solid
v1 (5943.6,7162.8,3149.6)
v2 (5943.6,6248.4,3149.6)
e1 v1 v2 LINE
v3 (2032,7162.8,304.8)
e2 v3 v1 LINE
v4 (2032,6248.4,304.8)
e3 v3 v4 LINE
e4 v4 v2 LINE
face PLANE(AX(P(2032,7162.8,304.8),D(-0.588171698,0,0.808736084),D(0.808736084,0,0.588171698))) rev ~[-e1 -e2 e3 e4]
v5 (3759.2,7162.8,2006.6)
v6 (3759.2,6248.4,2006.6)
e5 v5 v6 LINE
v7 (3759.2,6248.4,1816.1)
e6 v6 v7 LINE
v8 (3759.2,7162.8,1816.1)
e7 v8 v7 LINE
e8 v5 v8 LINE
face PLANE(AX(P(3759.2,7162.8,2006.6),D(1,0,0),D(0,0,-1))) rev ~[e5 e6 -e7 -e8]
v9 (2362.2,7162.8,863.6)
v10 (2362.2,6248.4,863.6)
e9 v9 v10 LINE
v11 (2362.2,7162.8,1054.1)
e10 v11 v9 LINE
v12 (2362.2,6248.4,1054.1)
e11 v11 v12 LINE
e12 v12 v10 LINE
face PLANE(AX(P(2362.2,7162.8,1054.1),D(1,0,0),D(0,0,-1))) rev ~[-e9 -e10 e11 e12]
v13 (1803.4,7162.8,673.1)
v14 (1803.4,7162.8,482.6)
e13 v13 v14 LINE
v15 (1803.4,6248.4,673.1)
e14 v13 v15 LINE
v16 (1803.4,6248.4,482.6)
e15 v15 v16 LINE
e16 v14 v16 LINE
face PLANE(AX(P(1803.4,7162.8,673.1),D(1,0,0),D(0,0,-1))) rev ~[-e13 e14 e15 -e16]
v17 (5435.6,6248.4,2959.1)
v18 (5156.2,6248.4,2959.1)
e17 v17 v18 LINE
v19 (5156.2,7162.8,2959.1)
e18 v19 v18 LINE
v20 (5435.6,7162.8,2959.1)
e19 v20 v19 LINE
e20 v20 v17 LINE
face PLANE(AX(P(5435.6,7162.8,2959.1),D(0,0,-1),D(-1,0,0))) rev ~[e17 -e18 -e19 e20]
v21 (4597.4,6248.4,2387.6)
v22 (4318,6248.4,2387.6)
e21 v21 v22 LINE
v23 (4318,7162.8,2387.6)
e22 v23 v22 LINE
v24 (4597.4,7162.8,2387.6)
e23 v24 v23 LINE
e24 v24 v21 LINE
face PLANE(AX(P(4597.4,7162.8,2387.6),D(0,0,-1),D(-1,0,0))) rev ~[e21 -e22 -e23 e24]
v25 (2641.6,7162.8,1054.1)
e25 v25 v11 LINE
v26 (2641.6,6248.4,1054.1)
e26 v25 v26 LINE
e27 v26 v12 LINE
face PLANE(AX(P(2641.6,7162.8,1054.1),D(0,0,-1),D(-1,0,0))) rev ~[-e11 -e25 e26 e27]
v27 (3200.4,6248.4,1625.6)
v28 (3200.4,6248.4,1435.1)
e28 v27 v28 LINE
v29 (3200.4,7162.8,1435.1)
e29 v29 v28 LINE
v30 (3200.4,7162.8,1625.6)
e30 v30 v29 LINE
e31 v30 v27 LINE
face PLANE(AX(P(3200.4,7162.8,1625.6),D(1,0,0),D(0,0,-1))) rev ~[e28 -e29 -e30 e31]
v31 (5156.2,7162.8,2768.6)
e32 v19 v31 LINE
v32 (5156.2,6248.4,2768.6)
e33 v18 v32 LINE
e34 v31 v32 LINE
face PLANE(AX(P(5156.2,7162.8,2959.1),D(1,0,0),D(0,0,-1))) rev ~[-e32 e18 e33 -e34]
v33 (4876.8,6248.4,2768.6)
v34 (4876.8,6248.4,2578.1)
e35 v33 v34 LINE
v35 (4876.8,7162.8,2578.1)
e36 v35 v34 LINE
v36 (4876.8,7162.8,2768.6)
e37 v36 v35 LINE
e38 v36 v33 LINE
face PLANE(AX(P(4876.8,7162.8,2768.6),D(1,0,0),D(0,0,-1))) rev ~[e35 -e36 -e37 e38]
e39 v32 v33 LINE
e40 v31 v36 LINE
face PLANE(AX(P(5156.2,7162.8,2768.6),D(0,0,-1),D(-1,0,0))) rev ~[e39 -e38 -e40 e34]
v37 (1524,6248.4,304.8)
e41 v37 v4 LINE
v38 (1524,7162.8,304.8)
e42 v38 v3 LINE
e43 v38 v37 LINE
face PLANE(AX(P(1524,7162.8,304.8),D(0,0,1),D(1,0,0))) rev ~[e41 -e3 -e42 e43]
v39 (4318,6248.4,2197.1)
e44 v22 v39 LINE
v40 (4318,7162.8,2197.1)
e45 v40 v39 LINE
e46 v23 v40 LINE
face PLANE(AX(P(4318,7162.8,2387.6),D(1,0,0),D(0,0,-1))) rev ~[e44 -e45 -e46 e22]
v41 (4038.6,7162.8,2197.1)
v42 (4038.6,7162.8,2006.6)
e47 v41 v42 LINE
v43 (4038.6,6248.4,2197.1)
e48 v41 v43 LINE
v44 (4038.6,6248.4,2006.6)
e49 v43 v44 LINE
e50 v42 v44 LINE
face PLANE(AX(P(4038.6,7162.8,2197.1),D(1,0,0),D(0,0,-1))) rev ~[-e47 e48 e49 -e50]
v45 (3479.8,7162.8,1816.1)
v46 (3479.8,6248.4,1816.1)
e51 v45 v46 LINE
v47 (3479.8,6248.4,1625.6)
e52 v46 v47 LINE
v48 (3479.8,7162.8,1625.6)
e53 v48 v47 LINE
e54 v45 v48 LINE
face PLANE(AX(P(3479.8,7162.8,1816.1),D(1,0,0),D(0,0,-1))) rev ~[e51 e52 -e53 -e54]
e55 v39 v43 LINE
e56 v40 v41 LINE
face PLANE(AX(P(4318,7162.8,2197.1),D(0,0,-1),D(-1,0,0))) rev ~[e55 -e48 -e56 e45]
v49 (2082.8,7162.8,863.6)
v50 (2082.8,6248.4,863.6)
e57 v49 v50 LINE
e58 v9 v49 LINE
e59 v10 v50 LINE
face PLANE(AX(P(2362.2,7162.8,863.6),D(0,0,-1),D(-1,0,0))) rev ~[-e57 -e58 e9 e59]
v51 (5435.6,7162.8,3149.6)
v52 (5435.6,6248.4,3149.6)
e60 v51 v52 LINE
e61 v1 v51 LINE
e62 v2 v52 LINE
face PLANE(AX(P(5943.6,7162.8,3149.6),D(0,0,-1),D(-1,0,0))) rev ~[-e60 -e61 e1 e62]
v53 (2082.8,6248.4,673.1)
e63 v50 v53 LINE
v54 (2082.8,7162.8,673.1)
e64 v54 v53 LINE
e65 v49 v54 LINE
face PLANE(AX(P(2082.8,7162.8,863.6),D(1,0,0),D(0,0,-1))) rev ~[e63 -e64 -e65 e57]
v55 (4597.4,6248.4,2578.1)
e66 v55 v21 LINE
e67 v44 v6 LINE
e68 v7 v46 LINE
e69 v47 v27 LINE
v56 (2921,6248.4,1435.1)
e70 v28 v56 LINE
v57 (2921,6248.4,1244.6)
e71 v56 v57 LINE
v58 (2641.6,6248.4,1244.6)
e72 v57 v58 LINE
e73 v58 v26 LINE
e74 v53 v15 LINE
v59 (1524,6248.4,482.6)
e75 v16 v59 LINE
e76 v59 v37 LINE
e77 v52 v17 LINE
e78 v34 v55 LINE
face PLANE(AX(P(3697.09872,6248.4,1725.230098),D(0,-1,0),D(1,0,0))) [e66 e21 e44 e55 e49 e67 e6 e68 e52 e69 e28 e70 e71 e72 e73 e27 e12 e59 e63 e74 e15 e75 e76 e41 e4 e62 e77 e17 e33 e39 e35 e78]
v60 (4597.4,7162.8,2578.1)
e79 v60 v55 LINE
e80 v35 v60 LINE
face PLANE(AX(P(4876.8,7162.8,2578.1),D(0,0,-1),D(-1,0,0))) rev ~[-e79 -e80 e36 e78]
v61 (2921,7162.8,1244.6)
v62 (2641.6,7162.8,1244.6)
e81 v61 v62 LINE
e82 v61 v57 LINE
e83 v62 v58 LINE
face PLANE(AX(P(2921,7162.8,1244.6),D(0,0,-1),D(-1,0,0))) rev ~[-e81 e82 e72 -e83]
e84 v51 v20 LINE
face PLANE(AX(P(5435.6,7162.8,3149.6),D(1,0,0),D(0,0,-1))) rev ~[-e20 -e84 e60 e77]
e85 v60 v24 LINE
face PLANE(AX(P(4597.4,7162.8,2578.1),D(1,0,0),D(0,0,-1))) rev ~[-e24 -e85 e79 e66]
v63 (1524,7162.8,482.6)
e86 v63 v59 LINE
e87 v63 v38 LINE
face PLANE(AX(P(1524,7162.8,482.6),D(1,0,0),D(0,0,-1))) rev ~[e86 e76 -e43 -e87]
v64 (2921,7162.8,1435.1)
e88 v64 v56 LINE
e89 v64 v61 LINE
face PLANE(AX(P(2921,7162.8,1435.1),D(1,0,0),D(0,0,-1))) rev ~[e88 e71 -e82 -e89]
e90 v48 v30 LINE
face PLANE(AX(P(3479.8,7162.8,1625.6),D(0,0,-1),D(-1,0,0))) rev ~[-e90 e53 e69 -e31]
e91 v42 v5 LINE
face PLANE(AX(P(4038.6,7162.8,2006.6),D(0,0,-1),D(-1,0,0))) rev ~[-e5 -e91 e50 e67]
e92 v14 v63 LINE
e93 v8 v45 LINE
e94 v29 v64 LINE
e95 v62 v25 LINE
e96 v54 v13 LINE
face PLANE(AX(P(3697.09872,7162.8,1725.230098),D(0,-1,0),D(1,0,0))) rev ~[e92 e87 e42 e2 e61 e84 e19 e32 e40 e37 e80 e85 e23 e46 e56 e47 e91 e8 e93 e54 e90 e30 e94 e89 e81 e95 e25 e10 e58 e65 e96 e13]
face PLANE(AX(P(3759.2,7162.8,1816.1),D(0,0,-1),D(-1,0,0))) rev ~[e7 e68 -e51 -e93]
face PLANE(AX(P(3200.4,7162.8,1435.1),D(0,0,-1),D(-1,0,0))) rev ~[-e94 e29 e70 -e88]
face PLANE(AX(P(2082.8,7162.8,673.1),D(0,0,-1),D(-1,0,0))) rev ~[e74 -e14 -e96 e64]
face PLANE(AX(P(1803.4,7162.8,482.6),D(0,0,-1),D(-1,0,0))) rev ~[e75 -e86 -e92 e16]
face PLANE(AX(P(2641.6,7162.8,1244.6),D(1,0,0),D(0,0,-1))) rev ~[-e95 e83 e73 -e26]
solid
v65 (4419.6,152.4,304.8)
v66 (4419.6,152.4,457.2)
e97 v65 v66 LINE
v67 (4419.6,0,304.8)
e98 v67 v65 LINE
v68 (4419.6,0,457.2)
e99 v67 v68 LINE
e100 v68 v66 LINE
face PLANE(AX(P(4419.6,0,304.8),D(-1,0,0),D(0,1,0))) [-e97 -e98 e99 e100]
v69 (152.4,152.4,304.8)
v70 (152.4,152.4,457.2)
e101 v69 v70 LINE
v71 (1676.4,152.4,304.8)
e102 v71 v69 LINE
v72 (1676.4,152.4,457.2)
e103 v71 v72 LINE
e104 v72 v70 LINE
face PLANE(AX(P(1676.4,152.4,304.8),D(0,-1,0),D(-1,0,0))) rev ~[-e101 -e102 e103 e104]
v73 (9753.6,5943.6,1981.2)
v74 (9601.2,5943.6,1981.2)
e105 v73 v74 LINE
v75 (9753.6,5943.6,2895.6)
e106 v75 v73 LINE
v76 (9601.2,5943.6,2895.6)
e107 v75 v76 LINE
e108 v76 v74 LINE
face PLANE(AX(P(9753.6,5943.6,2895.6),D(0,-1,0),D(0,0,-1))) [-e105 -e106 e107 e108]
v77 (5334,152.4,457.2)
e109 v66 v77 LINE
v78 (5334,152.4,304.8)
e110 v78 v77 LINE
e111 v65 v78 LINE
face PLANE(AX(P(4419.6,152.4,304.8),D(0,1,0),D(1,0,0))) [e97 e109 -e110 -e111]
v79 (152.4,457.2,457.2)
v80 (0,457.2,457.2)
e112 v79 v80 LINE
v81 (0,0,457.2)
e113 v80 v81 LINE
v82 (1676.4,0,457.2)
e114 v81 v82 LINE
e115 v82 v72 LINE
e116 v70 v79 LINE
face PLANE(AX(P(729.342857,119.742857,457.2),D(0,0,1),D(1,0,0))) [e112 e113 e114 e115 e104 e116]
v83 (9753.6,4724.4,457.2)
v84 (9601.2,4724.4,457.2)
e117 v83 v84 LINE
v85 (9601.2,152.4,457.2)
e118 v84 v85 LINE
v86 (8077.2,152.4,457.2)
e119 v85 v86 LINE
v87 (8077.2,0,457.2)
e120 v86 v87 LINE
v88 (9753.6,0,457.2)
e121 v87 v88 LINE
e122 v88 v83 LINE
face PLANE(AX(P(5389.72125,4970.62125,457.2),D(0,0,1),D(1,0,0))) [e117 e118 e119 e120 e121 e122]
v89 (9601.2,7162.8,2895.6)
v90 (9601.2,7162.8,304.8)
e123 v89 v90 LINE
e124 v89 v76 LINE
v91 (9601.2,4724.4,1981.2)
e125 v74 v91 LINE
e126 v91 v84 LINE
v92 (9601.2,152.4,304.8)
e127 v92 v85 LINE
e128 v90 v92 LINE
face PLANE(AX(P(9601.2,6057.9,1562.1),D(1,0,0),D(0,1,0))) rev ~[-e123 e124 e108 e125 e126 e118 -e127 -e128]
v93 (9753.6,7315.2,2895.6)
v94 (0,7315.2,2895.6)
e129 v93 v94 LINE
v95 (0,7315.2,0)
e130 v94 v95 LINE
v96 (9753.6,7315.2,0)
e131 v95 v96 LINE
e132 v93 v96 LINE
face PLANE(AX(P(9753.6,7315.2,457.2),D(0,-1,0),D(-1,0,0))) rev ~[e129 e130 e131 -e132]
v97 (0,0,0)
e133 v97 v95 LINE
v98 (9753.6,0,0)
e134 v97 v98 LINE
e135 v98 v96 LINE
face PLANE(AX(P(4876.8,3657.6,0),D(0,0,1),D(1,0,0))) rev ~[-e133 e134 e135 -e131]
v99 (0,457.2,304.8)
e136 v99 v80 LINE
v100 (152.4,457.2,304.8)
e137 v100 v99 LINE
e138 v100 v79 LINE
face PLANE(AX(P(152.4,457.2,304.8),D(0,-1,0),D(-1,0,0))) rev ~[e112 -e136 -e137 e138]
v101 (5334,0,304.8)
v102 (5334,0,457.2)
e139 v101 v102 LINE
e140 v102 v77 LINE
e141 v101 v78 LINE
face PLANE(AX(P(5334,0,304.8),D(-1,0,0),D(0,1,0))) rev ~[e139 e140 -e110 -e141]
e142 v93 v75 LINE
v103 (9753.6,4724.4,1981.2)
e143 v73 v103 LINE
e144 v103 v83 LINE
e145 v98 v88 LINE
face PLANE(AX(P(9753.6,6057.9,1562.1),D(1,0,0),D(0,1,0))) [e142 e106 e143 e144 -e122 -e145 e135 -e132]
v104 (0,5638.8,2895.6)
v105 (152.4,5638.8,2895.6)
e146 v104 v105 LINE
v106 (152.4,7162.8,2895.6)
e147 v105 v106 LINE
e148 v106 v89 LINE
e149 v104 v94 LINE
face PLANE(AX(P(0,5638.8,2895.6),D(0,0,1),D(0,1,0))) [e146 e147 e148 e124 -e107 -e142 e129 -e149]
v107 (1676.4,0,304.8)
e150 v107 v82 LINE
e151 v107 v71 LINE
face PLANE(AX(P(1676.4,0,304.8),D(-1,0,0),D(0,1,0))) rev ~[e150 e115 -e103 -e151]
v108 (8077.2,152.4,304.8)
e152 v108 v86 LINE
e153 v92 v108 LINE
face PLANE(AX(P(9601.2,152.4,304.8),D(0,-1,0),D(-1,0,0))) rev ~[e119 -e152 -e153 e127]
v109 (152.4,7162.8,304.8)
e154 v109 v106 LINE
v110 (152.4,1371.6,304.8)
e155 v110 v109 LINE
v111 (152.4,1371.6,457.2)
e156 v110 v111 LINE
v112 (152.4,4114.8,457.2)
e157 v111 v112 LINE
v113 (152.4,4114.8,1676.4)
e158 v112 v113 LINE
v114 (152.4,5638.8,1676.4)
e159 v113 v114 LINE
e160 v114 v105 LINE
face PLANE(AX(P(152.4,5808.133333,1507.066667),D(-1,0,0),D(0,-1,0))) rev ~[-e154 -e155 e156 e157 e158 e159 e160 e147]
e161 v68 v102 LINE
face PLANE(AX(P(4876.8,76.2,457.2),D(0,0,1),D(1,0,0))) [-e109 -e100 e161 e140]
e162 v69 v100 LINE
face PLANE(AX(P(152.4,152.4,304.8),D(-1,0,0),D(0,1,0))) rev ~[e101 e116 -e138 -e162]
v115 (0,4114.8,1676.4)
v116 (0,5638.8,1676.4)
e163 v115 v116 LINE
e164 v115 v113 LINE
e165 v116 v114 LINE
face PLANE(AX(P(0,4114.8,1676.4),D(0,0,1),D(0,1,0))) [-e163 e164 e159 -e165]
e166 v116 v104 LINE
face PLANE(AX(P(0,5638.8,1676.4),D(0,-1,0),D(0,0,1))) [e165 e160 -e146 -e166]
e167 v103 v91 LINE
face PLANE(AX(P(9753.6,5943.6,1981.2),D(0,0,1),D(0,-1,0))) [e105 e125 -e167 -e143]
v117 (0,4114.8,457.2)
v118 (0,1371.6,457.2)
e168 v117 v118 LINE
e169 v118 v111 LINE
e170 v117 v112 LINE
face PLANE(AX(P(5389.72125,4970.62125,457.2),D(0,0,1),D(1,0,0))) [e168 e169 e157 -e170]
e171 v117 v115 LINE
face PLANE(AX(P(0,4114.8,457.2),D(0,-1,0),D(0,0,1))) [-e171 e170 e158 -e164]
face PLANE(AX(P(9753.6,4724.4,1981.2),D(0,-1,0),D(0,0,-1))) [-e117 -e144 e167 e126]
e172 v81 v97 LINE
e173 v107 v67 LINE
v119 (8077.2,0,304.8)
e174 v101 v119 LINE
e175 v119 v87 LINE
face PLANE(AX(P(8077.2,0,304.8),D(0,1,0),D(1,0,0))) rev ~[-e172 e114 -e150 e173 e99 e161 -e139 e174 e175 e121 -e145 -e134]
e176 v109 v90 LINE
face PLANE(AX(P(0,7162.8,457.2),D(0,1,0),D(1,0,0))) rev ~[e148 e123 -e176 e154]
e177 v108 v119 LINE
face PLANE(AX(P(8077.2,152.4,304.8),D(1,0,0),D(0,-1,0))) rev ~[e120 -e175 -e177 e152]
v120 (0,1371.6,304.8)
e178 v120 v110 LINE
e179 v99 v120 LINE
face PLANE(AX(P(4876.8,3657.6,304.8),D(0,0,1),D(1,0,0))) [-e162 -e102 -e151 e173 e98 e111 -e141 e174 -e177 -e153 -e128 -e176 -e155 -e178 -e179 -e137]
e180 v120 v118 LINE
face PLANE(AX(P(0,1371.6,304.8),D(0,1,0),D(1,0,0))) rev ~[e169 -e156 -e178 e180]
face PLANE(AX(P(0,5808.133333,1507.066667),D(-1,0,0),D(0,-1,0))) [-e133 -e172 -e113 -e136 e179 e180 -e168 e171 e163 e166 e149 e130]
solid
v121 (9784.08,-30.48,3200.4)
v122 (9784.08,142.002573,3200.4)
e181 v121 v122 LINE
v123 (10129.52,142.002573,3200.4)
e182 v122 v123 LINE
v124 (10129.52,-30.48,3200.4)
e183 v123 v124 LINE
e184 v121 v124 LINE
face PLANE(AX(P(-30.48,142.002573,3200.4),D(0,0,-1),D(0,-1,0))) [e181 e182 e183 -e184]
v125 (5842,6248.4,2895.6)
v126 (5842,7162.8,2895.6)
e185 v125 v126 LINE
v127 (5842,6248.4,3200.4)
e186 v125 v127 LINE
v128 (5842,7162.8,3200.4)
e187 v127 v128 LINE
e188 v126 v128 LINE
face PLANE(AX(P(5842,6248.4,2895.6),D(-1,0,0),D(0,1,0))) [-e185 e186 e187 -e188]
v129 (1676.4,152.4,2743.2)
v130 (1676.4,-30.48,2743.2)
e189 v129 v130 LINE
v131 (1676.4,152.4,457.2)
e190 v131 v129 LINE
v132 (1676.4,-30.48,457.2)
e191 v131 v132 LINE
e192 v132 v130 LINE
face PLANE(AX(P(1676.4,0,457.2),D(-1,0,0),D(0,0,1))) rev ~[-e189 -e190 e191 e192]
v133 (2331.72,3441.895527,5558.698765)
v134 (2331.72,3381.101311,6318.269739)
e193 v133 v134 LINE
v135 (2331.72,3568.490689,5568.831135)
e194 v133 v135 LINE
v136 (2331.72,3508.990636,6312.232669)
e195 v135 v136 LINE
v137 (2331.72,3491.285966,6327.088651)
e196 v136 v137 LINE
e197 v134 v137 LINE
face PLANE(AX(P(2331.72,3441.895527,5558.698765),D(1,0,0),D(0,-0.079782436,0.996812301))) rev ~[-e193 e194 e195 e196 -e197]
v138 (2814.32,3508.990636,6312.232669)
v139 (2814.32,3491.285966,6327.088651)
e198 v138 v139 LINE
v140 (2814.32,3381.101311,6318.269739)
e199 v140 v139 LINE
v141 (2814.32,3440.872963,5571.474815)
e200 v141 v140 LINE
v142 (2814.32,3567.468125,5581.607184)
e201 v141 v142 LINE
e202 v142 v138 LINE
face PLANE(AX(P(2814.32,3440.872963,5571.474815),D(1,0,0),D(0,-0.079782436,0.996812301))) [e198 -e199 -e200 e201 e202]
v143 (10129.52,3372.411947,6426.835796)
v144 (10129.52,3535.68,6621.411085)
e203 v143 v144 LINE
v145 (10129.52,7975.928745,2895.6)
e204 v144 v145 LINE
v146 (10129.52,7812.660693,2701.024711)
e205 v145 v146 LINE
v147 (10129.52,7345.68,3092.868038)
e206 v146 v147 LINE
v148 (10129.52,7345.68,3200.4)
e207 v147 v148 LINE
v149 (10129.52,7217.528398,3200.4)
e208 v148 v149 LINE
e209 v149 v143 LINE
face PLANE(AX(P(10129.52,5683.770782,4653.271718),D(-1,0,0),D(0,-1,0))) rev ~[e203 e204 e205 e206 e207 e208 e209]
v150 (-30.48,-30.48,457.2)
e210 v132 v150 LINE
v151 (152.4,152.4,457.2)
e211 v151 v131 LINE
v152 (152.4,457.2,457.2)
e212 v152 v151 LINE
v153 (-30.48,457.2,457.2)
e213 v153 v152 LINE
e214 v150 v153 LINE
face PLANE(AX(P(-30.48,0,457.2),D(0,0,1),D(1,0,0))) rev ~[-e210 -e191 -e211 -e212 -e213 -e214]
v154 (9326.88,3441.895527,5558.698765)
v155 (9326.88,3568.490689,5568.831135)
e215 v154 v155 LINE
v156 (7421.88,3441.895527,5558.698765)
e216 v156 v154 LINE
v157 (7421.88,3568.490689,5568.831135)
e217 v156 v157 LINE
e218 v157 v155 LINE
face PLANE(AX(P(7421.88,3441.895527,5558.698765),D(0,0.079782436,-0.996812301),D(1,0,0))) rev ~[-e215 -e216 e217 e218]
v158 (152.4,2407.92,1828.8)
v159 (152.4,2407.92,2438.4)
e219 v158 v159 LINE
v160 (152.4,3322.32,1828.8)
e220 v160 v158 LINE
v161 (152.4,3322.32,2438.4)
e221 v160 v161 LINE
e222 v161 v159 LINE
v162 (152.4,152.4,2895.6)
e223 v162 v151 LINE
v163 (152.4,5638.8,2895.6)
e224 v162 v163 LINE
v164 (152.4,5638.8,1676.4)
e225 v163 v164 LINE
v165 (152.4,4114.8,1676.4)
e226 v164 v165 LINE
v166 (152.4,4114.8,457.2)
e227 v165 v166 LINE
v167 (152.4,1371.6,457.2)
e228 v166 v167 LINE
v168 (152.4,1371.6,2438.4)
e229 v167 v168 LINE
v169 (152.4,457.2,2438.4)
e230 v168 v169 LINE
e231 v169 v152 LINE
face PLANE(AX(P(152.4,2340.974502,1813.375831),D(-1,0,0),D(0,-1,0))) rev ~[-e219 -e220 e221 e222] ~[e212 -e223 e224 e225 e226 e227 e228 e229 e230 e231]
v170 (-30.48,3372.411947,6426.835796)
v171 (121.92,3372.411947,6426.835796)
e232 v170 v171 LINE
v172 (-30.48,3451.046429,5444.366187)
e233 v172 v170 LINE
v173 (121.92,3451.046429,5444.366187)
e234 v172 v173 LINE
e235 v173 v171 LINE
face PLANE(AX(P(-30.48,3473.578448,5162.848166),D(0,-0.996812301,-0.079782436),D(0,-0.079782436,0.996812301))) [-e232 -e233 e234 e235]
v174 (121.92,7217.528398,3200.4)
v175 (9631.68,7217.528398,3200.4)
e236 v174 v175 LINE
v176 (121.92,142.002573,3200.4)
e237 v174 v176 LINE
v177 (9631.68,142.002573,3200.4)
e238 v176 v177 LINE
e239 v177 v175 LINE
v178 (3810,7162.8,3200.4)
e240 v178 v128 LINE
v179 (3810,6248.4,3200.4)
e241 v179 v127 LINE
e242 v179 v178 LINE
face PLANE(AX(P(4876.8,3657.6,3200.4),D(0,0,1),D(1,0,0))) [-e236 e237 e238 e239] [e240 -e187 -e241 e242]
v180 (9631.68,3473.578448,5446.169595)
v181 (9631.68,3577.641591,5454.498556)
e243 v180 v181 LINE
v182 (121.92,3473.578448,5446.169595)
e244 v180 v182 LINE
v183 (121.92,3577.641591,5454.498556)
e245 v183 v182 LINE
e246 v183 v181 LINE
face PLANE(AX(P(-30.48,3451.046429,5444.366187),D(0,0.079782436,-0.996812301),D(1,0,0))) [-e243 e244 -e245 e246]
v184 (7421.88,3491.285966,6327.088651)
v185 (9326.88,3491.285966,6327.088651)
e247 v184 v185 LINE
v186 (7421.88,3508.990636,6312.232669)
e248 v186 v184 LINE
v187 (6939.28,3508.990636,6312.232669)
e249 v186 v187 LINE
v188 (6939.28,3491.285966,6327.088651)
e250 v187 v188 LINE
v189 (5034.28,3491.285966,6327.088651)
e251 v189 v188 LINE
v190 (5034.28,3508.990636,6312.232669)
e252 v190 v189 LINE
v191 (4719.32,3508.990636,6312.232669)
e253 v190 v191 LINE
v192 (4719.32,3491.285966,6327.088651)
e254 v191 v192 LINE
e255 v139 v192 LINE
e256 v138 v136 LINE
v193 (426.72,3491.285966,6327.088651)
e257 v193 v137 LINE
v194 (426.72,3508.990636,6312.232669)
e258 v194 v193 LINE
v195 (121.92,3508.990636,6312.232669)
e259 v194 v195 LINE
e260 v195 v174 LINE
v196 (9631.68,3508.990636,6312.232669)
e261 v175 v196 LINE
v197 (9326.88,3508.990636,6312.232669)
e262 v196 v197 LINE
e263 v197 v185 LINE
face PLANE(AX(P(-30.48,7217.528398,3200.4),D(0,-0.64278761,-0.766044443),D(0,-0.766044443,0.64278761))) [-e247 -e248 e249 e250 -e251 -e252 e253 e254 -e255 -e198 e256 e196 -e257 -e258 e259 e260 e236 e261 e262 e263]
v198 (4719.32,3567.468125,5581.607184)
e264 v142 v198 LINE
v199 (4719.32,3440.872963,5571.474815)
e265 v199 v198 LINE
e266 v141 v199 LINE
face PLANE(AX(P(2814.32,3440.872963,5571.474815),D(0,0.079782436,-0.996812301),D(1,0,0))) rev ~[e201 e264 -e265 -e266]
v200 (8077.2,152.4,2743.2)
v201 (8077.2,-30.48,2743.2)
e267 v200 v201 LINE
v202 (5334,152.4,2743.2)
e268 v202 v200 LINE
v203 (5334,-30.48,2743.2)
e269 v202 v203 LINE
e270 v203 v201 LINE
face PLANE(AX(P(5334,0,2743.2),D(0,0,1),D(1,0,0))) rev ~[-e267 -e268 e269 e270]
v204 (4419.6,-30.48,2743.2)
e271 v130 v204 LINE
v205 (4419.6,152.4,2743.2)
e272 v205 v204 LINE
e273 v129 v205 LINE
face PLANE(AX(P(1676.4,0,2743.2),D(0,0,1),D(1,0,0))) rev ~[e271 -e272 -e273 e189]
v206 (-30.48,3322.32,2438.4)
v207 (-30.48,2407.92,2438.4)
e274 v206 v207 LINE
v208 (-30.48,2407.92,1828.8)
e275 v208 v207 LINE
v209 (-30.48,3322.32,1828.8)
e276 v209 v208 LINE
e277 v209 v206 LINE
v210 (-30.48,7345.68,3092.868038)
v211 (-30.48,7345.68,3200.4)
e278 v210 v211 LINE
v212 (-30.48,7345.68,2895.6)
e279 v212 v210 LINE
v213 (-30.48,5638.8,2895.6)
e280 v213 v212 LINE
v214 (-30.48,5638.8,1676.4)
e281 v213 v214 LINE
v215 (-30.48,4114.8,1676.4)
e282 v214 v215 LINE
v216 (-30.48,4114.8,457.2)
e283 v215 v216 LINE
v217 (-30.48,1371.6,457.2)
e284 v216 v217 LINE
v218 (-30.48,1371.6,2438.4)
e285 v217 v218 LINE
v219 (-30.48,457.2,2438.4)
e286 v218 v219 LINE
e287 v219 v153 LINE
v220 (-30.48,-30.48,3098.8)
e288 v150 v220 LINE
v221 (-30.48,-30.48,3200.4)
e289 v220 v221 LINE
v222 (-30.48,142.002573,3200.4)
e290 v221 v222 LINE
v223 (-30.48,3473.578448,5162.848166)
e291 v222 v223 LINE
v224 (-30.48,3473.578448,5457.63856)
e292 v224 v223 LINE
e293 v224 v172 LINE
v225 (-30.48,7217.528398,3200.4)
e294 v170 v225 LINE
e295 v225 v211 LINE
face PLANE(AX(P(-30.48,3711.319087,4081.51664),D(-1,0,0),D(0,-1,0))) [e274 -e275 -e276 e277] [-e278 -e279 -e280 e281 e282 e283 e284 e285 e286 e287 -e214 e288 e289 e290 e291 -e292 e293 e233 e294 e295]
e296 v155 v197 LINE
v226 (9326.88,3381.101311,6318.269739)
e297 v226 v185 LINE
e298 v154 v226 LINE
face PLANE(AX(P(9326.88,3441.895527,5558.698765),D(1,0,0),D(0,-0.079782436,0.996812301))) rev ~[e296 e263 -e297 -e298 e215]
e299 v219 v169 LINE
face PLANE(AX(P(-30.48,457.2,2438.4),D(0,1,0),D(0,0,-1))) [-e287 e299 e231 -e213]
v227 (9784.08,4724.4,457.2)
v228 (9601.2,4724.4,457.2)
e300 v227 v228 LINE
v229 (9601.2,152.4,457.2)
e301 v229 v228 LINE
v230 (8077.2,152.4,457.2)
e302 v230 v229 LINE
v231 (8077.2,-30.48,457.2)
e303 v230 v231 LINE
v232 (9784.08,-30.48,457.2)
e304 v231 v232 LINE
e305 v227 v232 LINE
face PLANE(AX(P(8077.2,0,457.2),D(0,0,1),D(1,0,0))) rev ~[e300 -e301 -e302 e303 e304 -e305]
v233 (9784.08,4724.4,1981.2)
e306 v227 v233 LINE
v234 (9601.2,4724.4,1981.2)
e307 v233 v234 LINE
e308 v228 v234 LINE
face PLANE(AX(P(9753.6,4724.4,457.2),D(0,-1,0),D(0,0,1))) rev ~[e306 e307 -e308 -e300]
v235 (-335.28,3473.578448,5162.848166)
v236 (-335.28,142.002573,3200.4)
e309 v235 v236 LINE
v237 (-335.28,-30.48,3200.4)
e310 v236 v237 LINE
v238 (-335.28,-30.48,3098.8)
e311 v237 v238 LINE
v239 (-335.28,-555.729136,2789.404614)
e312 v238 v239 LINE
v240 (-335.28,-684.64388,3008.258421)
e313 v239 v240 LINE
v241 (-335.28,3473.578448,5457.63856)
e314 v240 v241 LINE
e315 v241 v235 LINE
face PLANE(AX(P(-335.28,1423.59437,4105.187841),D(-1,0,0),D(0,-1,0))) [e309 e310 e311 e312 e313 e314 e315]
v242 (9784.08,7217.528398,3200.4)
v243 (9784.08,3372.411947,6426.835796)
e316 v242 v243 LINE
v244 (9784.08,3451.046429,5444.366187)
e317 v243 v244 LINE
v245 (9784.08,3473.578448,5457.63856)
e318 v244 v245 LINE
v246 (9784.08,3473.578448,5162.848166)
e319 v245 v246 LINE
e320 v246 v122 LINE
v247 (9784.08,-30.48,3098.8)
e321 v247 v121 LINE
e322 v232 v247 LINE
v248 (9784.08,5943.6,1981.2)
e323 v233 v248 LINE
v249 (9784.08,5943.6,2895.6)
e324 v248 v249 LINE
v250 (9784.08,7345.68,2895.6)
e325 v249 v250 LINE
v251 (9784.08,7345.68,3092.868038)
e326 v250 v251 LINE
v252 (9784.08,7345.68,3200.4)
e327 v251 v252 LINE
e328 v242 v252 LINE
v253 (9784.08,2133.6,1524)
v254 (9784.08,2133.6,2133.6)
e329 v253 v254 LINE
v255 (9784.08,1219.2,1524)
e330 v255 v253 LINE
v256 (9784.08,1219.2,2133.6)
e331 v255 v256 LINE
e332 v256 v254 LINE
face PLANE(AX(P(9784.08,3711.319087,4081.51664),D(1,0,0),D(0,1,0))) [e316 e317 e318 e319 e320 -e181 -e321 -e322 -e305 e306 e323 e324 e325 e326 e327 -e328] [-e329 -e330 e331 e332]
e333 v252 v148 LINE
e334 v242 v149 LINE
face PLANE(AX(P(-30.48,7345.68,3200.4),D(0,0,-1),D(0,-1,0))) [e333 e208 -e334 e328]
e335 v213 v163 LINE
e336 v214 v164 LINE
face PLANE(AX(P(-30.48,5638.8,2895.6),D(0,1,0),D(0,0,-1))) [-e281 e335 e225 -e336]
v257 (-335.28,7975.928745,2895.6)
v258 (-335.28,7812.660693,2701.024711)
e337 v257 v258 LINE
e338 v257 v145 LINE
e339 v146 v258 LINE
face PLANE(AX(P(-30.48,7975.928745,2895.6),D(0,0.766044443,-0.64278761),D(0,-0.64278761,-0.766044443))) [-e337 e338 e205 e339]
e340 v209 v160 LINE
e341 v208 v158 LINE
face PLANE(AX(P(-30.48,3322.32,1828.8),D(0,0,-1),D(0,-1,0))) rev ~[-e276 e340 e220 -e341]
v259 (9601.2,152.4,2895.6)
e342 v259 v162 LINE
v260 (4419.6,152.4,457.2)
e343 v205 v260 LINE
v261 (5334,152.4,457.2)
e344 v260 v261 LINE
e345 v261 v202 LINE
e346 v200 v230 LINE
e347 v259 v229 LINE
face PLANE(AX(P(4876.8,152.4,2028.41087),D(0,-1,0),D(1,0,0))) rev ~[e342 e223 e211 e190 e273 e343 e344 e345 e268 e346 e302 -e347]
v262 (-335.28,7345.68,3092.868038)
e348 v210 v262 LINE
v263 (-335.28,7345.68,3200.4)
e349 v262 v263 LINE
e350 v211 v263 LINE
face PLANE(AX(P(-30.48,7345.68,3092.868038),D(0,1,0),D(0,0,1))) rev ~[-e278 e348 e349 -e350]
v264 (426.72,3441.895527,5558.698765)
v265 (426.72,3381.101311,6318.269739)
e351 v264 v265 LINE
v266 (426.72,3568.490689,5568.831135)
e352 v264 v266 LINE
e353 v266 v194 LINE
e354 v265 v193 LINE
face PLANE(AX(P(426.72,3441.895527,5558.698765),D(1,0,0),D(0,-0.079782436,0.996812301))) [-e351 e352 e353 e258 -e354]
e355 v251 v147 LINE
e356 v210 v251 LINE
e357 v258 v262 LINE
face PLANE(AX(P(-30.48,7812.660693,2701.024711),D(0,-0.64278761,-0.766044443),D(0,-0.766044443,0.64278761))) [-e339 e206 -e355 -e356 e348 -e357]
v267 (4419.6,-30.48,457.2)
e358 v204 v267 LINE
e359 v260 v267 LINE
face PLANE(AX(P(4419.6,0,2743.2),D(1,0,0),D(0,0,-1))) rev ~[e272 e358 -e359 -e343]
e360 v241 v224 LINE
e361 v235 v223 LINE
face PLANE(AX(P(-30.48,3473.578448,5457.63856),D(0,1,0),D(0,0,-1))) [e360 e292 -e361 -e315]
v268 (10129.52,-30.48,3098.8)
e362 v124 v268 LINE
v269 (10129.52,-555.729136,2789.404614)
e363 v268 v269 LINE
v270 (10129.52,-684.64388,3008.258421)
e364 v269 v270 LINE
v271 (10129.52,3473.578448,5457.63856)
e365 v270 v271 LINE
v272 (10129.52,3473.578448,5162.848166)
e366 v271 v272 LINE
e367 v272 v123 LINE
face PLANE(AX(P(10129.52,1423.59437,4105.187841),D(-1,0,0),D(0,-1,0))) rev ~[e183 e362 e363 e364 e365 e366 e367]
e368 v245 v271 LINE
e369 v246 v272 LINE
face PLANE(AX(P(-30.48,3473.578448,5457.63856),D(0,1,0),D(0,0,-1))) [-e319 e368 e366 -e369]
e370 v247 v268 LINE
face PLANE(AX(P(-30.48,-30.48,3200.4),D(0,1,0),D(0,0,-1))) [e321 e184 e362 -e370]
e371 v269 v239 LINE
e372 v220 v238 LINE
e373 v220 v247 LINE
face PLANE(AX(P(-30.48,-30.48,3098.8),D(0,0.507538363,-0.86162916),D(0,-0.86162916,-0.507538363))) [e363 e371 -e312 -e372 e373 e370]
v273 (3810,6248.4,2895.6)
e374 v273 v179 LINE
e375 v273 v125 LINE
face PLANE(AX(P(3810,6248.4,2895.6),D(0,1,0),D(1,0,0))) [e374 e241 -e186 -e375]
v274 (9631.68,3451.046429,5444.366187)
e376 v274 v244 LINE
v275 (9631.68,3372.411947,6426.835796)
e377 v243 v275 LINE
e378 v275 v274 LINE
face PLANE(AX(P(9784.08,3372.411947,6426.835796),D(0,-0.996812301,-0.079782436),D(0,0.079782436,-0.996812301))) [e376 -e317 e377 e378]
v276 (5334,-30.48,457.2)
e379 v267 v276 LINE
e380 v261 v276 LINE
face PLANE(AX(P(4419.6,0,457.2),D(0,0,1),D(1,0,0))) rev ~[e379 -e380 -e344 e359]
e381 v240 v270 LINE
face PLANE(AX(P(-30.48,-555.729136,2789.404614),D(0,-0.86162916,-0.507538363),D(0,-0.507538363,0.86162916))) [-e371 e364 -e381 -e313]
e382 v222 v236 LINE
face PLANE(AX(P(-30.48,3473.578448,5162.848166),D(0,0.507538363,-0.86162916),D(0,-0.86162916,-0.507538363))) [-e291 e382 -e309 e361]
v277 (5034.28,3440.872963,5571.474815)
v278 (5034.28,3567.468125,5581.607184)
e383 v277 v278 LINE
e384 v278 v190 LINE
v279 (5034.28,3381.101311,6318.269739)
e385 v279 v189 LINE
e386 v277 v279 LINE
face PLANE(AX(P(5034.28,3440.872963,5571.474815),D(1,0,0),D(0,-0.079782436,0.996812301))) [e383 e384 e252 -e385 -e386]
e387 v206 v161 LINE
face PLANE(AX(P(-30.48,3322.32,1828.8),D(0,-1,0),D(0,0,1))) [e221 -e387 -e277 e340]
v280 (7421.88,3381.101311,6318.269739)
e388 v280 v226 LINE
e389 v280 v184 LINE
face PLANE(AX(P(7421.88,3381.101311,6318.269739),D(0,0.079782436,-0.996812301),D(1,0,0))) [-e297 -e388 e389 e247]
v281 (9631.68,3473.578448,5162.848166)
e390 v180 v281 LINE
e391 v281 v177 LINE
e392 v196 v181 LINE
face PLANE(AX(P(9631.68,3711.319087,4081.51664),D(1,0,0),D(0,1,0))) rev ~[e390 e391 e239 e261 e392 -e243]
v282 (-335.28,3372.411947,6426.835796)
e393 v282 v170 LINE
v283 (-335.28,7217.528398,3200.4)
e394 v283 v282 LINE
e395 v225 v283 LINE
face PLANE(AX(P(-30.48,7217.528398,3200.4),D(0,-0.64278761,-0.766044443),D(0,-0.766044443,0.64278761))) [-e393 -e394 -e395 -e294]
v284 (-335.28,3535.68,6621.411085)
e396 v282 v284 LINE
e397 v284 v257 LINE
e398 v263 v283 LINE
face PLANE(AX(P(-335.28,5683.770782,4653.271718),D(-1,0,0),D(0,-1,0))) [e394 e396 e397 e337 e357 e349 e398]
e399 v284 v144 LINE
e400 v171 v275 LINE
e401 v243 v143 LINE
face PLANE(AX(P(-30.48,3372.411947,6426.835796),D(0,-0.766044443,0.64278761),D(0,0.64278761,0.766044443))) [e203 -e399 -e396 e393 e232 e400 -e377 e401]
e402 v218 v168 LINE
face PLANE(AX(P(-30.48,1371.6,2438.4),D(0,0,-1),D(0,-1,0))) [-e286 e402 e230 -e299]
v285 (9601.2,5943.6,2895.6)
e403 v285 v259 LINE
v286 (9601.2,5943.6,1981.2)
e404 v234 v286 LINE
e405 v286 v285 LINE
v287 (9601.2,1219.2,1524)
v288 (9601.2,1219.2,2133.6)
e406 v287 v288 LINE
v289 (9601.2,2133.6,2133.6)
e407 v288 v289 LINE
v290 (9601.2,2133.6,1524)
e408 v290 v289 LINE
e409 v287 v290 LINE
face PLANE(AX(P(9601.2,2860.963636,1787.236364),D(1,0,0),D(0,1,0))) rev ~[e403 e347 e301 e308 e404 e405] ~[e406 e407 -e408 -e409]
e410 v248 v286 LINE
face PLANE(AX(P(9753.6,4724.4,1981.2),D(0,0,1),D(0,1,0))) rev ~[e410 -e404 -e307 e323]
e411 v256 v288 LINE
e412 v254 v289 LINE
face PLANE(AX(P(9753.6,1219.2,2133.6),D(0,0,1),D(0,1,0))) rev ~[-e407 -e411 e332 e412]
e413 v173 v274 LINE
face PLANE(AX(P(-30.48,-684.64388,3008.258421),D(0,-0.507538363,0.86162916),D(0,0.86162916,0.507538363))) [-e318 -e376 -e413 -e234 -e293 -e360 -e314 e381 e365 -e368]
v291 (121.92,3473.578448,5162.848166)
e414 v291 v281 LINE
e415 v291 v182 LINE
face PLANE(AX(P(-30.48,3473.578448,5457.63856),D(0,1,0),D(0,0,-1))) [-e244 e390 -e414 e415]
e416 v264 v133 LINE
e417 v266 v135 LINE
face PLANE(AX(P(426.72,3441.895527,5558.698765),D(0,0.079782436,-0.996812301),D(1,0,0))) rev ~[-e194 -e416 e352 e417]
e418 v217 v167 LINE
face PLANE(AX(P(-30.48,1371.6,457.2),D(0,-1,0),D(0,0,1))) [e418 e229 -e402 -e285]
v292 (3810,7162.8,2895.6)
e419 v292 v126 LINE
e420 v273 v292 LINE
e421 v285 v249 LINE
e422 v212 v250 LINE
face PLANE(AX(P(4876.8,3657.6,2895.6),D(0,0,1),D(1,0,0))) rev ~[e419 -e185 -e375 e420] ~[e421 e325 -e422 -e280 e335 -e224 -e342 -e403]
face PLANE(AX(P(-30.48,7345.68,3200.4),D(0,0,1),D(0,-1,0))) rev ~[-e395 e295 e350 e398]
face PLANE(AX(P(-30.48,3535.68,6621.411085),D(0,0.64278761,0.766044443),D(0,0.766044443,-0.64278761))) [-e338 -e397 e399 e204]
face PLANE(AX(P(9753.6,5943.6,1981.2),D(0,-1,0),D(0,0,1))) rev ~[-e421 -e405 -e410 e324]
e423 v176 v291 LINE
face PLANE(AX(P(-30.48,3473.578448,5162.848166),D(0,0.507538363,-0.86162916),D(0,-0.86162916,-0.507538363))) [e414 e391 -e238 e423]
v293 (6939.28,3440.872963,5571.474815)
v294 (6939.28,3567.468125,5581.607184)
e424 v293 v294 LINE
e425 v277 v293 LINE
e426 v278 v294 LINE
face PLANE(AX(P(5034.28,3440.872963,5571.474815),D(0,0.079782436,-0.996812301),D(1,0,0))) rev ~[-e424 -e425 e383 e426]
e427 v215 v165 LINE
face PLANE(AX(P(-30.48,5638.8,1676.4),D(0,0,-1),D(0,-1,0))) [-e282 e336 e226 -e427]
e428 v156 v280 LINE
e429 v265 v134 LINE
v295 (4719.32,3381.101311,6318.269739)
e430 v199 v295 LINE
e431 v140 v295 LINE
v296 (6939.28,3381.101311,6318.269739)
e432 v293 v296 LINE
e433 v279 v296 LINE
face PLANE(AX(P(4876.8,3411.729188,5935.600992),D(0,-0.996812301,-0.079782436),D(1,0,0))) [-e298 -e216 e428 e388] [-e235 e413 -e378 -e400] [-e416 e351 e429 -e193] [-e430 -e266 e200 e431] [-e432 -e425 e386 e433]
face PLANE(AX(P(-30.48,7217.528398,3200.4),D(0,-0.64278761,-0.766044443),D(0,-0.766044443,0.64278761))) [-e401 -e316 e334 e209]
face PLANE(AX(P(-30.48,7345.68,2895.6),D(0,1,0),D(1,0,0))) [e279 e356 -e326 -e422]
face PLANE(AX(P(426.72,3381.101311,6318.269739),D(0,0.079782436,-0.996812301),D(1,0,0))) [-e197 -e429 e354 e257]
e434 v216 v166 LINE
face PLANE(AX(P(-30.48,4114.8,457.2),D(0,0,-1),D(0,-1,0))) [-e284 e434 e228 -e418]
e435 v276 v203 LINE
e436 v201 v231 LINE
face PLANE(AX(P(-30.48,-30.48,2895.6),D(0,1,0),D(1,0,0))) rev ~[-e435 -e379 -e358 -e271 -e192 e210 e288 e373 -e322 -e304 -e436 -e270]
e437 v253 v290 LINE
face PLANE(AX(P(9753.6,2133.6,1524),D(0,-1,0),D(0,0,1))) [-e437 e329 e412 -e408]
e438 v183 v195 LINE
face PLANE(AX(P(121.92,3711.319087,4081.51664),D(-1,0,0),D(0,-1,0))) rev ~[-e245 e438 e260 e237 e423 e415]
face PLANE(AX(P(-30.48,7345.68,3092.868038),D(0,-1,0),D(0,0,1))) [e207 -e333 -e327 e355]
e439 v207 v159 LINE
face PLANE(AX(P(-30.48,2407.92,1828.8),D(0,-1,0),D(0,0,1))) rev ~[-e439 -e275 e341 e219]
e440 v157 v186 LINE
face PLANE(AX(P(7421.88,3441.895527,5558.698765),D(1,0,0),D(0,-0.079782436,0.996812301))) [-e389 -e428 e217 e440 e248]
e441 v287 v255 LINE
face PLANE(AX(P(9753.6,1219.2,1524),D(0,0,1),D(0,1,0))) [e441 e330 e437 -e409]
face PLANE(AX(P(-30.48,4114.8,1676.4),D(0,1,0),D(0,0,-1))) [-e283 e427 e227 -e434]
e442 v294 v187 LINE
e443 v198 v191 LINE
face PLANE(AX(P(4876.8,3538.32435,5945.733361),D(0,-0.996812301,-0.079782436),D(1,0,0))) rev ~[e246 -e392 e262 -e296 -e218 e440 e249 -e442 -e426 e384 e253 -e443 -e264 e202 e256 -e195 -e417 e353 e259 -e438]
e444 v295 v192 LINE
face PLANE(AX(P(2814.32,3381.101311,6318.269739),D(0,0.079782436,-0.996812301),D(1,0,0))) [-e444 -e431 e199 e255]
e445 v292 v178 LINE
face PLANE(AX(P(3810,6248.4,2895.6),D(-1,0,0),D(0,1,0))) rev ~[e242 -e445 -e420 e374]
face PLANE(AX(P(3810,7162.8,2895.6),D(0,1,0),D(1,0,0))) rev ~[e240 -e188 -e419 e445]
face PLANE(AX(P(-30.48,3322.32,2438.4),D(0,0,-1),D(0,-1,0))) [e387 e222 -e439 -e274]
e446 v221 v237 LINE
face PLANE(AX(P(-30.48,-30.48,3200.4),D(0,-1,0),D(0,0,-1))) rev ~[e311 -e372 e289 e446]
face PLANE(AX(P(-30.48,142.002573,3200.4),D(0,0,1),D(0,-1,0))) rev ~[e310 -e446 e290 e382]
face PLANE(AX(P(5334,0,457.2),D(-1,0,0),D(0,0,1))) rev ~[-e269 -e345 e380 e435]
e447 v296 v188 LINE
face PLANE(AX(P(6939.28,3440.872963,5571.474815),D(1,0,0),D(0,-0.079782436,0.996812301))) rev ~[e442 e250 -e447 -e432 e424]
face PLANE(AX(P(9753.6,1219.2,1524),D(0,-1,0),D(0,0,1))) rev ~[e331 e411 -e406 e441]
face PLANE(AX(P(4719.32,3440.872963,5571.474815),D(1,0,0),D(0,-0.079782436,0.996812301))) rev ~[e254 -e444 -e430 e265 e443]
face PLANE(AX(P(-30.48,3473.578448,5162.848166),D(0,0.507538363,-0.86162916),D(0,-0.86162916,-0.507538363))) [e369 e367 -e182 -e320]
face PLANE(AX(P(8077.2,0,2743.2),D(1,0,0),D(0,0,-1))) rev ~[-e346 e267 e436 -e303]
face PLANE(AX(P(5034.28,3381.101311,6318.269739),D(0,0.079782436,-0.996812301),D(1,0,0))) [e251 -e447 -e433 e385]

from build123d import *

# Parameters (mm, degrees)
F0_W           = 9753.6
F0_H           = 7315.2
F1_DEPTH       = 304.8
F2_W           = 914.4
F2_H           = 152.4
F3_DEPTH       = 152.4
F5_DEPTH       = 2438.4
F7_DEPTH       = 152.4
F9_DEPTH       = 152.4
F10_W          = 914.4
F10_H          = 609.6
F11_DEPTH      = 152.4
F11_DEPTH_BACK = 30.48
F13_DEPTH      = 152.4
F13_DEPTH_BACK = 30.48
F14_W          = 914.4
F14_H          = 609.6
F15_DEPTH      = 182.88
F16_W          = 9814.56
F16_H          = 7376.16
F16_W_2        = 2032
F16_H_2        = 914.4
F17_DEPTH      = 304.8
F19_DEPTH      = 914.4
F24_DEPTH      = 304.8
F24_DEPTH_BACK = 10160
F26_DEPTH      = 152.4
F28_DEPTH      = 152.4
F29_W          = 9814.56
F29_H          = 985.611441973
F29_W_2        = 1905
F29_H_2        = 762
F29_H_3        = 749.1830940247
F30_DEPTH      = 127


with BuildPart() as f1:
    # F0 (on Top) → F1 (new body)
    with BuildSketch(Plane.XY):
        with Locations((4876.8, 3657.6)):
            Rectangle(F0_W, F0_H)
    extrude(amount=F1_DEPTH)

    # F2 (on face) → F3 (join)
    with BuildSketch(Plane.XY.offset(304.8)):
        with Locations((4876.8, 76.2)):
            Rectangle(F2_W, F2_H)
        Polygon((8077.2, 152.4), (8077.2, 0), (9753.6, 0), (9753.6, 7315.2), (0, 7315.2), (0, 1371.6), (152.4, 1371.6), (152.4, 7162.8), (9601.2, 7162.8), (9601.2, 152.4), align=None)
        Polygon((0, 0), (1676.4, 0), (1676.4, 152.4), (152.4, 152.4), (152.4, 457.2), (0, 457.2), align=None)
    extrude(amount=F3_DEPTH)

    # F4 (on face) → F5 (join)
    with BuildSketch(Plane.XY.offset(457.2)):
        Polygon((0, 7315.2), (0, 7162.8), (9601.2, 7162.8), (9753.6, 7162.8), (9753.6, 7315.2), align=None)
    extrude(amount=F5_DEPTH)

    # F6 (on face) → F7 (join)
    with BuildSketch(Plane.YZ.offset(9753.6)):
        Polygon((4724.4, 1981.2), (4724.4, 457.2), (7162.8, 457.2), (7162.8, 2895.6), (5943.6, 2895.6), (5943.6, 1981.2), align=None)
    extrude(amount=-F7_DEPTH)

    # F8 (on face) → F9 (join)
    with BuildSketch(Plane(origin=(0, 0, 0), x_dir=(0, -1, 0), z_dir=(-1, 0, 0))):
        Polygon((-7162.8, 457.2), (-4114.8, 457.2), (-4114.8, 1676.4), (-5638.8, 1676.4), (-5638.8, 2895.6), (-7162.8, 2895.6), align=None)
    extrude(amount=-F9_DEPTH)


with BuildPart() as f11:
    # F10 (on face) → F11 (new body, two sides)
    with BuildSketch(Plane.YZ.offset(9753.6)) as f11_sk:
        Polygon((5943.6, 1981.2), (5943.6, 2895.6), (0, 2895.6), (0, 457.2), (4724.4, 457.2), (4724.4, 1981.2), align=None)
        with Locations((1676.4, 1828.8)):
            Rectangle(F10_W, F10_H, mode=Mode.SUBTRACT)
    extrude(amount=-F11_DEPTH)
    extrude(f11_sk.sketch, amount=F11_DEPTH_BACK)

    # F12 (on face) → F13 (join, two sides)
    with BuildSketch(Plane.XZ) as f13_sk:
        Polygon((-30.48, 457.2), (0, 457.2), (1676.4, 457.2), (1676.4, 2743.2), (4419.6, 2743.2), (4419.6, 457.2), (5334, 457.2), (5334, 2743.2), (8077.2, 2743.2), (8077.2, 457.2), (9601.2, 457.2), (9753.6, 457.2), (9784.08, 457.2), (9784.08, 2895.6), (9601.2, 2895.6), (152.4, 2895.6), (-30.48, 2895.6), align=None)
    extrude(amount=-F13_DEPTH)
    extrude(f13_sk.sketch, amount=F13_DEPTH_BACK)

    # F14 (on face) → F15 (join)
    with BuildSketch(Plane(origin=(-30.48, 0, 0), x_dir=(0, -1, 0), z_dir=(-1, 0, 0))):
        Polygon((30.48, 2895.6), (-5638.8, 2895.6), (-5638.8, 1676.4), (-4114.8, 1676.4), (-4114.8, 457.2), (-1371.6, 457.2), (-1371.6, 2438.4), (-457.2, 2438.4), (-457.2, 457.2), (30.48, 457.2), align=None)
        with Locations((-2865.12, 2133.6)):
            Rectangle(F14_W, F14_H, mode=Mode.SUBTRACT)
    extrude(amount=-F15_DEPTH)

    # F16 (on face) → F17 (join)
    with BuildSketch(Plane.XY.offset(2895.6)):
        with Locations((4876.8, 3657.6)):
            Rectangle(F16_W, F16_H)
        with Locations((4826, 6705.6)):
            Rectangle(F16_W_2, F16_H_2, mode=Mode.SUBTRACT)
    extrude(amount=F17_DEPTH)

    # F23 (on face) → F24 (join, two sides)
    with BuildSketch(Plane(origin=(-30.48, 0, 0), x_dir=(0, -1, 0), z_dir=(-1, 0, 0))) as f24_sk:
        Polygon((-7975.9287453857, 2895.6), (-7812.6606925253, 2701.0247114478), (-7345.68, 3092.8680383127), (-7345.68, 3200.4), (-7217.5283983405, 3200.4), (-3372.4119471396, 6426.8357960363), (-3535.68, 6621.4110845885), align=None)
        Polygon((684.6438803972, 3008.2584206913), (-3473.5784478936, 5457.6385603397), (-3473.5784478936, 5162.8481659781), (-142.0025729235, 3200.4), (30.48, 3200.4), (30.48, 3098.8), (555.7291362052, 2789.4046139392), align=None)
    extrude(amount=F24_DEPTH)
    extrude(f24_sk.sketch, amount=-F24_DEPTH_BACK)

    # F25 (on face) → F26 (join)
    with BuildSketch(Plane(origin=(-30.48, 0, 0), x_dir=(0, -1, 0), z_dir=(-1, 0, 0))):
        Polygon((-3372.4119471396, 6426.8357960363), (-7217.5283983405, 3200.4), (-142.0025729235, 3200.4), (-3473.5784478936, 5162.8481659781), align=None)
    extrude(amount=-F26_DEPTH)

    # F27 (on face) → F28 (join)
    with BuildSketch(Plane.YZ.offset(9784.08)):
        Polygon((142.0025729235, 3200.4), (7217.5283983404, 3200.4), (3372.4119471396, 6426.8357960363), (3473.5784478936, 5162.8481659781), align=None)
    extrude(amount=-F28_DEPTH)

    # F29 (on face) → F30 (join)
    with BuildSketch(Plane(origin=(0, 3862.0598735135, 309.1098946023), x_dir=(1, 0, 0), z_dir=(0, -0.9968123007, -0.0797824361))):
        with Locations((4876.8, 5644.4840144651)):
            Rectangle(F29_W, F29_H)
        with Locations((1379.22, 5647.3764953613)):
            Rectangle(F29_W_2, F29_H_2, mode=Mode.SUBTRACT)
        with Locations((3766.82, 5653.784948349)):
            Rectangle(F29_W_2, F29_H_3, mode=Mode.SUBTRACT)
        with Locations((5986.78, 5653.784948349)):
            Rectangle(F29_W_2, F29_H_3, mode=Mode.SUBTRACT)
        with Locations((8374.38, 5647.3764953613)):
            Rectangle(F29_W_2, F29_H_2, mode=Mode.SUBTRACT)
    extrude(amount=-F30_DEPTH)


with BuildPart() as f19:
    # F18 (on face) → F19 (new body)
    with BuildSketch(Plane.XZ.offset(-7162.8)):
        Polygon((1524, 482.6), (1524, 304.8), (2032, 304.8), (5943.6, 3149.6), (5435.6, 3149.6), (5435.6, 2959.1), (5156.2, 2959.1), (5156.2, 2768.6), (4876.8, 2768.6), (4876.8, 2578.1), (4597.4, 2578.1), (4597.4, 2387.6), (4318, 2387.6), (4318, 2197.1), (4038.6, 2197.1), (4038.6, 2006.6), (3759.2, 2006.6), (3759.2, 1816.1), (3479.8, 1816.1), (3479.8, 1625.6), (3200.4, 1625.6), (3200.4, 1435.1), (2921, 1435.1), (2921, 1244.6), (2641.6, 1244.6), (2641.6, 1054.1), (2362.2, 1054.1), (2362.2, 863.6), (2082.8, 863.6), (2082.8, 673.1), (1803.4, 673.1), (1803.4, 482.6), align=None)
    extrude(amount=F19_DEPTH)


solid = Compound([f1.part, f11.part, f19.part])
